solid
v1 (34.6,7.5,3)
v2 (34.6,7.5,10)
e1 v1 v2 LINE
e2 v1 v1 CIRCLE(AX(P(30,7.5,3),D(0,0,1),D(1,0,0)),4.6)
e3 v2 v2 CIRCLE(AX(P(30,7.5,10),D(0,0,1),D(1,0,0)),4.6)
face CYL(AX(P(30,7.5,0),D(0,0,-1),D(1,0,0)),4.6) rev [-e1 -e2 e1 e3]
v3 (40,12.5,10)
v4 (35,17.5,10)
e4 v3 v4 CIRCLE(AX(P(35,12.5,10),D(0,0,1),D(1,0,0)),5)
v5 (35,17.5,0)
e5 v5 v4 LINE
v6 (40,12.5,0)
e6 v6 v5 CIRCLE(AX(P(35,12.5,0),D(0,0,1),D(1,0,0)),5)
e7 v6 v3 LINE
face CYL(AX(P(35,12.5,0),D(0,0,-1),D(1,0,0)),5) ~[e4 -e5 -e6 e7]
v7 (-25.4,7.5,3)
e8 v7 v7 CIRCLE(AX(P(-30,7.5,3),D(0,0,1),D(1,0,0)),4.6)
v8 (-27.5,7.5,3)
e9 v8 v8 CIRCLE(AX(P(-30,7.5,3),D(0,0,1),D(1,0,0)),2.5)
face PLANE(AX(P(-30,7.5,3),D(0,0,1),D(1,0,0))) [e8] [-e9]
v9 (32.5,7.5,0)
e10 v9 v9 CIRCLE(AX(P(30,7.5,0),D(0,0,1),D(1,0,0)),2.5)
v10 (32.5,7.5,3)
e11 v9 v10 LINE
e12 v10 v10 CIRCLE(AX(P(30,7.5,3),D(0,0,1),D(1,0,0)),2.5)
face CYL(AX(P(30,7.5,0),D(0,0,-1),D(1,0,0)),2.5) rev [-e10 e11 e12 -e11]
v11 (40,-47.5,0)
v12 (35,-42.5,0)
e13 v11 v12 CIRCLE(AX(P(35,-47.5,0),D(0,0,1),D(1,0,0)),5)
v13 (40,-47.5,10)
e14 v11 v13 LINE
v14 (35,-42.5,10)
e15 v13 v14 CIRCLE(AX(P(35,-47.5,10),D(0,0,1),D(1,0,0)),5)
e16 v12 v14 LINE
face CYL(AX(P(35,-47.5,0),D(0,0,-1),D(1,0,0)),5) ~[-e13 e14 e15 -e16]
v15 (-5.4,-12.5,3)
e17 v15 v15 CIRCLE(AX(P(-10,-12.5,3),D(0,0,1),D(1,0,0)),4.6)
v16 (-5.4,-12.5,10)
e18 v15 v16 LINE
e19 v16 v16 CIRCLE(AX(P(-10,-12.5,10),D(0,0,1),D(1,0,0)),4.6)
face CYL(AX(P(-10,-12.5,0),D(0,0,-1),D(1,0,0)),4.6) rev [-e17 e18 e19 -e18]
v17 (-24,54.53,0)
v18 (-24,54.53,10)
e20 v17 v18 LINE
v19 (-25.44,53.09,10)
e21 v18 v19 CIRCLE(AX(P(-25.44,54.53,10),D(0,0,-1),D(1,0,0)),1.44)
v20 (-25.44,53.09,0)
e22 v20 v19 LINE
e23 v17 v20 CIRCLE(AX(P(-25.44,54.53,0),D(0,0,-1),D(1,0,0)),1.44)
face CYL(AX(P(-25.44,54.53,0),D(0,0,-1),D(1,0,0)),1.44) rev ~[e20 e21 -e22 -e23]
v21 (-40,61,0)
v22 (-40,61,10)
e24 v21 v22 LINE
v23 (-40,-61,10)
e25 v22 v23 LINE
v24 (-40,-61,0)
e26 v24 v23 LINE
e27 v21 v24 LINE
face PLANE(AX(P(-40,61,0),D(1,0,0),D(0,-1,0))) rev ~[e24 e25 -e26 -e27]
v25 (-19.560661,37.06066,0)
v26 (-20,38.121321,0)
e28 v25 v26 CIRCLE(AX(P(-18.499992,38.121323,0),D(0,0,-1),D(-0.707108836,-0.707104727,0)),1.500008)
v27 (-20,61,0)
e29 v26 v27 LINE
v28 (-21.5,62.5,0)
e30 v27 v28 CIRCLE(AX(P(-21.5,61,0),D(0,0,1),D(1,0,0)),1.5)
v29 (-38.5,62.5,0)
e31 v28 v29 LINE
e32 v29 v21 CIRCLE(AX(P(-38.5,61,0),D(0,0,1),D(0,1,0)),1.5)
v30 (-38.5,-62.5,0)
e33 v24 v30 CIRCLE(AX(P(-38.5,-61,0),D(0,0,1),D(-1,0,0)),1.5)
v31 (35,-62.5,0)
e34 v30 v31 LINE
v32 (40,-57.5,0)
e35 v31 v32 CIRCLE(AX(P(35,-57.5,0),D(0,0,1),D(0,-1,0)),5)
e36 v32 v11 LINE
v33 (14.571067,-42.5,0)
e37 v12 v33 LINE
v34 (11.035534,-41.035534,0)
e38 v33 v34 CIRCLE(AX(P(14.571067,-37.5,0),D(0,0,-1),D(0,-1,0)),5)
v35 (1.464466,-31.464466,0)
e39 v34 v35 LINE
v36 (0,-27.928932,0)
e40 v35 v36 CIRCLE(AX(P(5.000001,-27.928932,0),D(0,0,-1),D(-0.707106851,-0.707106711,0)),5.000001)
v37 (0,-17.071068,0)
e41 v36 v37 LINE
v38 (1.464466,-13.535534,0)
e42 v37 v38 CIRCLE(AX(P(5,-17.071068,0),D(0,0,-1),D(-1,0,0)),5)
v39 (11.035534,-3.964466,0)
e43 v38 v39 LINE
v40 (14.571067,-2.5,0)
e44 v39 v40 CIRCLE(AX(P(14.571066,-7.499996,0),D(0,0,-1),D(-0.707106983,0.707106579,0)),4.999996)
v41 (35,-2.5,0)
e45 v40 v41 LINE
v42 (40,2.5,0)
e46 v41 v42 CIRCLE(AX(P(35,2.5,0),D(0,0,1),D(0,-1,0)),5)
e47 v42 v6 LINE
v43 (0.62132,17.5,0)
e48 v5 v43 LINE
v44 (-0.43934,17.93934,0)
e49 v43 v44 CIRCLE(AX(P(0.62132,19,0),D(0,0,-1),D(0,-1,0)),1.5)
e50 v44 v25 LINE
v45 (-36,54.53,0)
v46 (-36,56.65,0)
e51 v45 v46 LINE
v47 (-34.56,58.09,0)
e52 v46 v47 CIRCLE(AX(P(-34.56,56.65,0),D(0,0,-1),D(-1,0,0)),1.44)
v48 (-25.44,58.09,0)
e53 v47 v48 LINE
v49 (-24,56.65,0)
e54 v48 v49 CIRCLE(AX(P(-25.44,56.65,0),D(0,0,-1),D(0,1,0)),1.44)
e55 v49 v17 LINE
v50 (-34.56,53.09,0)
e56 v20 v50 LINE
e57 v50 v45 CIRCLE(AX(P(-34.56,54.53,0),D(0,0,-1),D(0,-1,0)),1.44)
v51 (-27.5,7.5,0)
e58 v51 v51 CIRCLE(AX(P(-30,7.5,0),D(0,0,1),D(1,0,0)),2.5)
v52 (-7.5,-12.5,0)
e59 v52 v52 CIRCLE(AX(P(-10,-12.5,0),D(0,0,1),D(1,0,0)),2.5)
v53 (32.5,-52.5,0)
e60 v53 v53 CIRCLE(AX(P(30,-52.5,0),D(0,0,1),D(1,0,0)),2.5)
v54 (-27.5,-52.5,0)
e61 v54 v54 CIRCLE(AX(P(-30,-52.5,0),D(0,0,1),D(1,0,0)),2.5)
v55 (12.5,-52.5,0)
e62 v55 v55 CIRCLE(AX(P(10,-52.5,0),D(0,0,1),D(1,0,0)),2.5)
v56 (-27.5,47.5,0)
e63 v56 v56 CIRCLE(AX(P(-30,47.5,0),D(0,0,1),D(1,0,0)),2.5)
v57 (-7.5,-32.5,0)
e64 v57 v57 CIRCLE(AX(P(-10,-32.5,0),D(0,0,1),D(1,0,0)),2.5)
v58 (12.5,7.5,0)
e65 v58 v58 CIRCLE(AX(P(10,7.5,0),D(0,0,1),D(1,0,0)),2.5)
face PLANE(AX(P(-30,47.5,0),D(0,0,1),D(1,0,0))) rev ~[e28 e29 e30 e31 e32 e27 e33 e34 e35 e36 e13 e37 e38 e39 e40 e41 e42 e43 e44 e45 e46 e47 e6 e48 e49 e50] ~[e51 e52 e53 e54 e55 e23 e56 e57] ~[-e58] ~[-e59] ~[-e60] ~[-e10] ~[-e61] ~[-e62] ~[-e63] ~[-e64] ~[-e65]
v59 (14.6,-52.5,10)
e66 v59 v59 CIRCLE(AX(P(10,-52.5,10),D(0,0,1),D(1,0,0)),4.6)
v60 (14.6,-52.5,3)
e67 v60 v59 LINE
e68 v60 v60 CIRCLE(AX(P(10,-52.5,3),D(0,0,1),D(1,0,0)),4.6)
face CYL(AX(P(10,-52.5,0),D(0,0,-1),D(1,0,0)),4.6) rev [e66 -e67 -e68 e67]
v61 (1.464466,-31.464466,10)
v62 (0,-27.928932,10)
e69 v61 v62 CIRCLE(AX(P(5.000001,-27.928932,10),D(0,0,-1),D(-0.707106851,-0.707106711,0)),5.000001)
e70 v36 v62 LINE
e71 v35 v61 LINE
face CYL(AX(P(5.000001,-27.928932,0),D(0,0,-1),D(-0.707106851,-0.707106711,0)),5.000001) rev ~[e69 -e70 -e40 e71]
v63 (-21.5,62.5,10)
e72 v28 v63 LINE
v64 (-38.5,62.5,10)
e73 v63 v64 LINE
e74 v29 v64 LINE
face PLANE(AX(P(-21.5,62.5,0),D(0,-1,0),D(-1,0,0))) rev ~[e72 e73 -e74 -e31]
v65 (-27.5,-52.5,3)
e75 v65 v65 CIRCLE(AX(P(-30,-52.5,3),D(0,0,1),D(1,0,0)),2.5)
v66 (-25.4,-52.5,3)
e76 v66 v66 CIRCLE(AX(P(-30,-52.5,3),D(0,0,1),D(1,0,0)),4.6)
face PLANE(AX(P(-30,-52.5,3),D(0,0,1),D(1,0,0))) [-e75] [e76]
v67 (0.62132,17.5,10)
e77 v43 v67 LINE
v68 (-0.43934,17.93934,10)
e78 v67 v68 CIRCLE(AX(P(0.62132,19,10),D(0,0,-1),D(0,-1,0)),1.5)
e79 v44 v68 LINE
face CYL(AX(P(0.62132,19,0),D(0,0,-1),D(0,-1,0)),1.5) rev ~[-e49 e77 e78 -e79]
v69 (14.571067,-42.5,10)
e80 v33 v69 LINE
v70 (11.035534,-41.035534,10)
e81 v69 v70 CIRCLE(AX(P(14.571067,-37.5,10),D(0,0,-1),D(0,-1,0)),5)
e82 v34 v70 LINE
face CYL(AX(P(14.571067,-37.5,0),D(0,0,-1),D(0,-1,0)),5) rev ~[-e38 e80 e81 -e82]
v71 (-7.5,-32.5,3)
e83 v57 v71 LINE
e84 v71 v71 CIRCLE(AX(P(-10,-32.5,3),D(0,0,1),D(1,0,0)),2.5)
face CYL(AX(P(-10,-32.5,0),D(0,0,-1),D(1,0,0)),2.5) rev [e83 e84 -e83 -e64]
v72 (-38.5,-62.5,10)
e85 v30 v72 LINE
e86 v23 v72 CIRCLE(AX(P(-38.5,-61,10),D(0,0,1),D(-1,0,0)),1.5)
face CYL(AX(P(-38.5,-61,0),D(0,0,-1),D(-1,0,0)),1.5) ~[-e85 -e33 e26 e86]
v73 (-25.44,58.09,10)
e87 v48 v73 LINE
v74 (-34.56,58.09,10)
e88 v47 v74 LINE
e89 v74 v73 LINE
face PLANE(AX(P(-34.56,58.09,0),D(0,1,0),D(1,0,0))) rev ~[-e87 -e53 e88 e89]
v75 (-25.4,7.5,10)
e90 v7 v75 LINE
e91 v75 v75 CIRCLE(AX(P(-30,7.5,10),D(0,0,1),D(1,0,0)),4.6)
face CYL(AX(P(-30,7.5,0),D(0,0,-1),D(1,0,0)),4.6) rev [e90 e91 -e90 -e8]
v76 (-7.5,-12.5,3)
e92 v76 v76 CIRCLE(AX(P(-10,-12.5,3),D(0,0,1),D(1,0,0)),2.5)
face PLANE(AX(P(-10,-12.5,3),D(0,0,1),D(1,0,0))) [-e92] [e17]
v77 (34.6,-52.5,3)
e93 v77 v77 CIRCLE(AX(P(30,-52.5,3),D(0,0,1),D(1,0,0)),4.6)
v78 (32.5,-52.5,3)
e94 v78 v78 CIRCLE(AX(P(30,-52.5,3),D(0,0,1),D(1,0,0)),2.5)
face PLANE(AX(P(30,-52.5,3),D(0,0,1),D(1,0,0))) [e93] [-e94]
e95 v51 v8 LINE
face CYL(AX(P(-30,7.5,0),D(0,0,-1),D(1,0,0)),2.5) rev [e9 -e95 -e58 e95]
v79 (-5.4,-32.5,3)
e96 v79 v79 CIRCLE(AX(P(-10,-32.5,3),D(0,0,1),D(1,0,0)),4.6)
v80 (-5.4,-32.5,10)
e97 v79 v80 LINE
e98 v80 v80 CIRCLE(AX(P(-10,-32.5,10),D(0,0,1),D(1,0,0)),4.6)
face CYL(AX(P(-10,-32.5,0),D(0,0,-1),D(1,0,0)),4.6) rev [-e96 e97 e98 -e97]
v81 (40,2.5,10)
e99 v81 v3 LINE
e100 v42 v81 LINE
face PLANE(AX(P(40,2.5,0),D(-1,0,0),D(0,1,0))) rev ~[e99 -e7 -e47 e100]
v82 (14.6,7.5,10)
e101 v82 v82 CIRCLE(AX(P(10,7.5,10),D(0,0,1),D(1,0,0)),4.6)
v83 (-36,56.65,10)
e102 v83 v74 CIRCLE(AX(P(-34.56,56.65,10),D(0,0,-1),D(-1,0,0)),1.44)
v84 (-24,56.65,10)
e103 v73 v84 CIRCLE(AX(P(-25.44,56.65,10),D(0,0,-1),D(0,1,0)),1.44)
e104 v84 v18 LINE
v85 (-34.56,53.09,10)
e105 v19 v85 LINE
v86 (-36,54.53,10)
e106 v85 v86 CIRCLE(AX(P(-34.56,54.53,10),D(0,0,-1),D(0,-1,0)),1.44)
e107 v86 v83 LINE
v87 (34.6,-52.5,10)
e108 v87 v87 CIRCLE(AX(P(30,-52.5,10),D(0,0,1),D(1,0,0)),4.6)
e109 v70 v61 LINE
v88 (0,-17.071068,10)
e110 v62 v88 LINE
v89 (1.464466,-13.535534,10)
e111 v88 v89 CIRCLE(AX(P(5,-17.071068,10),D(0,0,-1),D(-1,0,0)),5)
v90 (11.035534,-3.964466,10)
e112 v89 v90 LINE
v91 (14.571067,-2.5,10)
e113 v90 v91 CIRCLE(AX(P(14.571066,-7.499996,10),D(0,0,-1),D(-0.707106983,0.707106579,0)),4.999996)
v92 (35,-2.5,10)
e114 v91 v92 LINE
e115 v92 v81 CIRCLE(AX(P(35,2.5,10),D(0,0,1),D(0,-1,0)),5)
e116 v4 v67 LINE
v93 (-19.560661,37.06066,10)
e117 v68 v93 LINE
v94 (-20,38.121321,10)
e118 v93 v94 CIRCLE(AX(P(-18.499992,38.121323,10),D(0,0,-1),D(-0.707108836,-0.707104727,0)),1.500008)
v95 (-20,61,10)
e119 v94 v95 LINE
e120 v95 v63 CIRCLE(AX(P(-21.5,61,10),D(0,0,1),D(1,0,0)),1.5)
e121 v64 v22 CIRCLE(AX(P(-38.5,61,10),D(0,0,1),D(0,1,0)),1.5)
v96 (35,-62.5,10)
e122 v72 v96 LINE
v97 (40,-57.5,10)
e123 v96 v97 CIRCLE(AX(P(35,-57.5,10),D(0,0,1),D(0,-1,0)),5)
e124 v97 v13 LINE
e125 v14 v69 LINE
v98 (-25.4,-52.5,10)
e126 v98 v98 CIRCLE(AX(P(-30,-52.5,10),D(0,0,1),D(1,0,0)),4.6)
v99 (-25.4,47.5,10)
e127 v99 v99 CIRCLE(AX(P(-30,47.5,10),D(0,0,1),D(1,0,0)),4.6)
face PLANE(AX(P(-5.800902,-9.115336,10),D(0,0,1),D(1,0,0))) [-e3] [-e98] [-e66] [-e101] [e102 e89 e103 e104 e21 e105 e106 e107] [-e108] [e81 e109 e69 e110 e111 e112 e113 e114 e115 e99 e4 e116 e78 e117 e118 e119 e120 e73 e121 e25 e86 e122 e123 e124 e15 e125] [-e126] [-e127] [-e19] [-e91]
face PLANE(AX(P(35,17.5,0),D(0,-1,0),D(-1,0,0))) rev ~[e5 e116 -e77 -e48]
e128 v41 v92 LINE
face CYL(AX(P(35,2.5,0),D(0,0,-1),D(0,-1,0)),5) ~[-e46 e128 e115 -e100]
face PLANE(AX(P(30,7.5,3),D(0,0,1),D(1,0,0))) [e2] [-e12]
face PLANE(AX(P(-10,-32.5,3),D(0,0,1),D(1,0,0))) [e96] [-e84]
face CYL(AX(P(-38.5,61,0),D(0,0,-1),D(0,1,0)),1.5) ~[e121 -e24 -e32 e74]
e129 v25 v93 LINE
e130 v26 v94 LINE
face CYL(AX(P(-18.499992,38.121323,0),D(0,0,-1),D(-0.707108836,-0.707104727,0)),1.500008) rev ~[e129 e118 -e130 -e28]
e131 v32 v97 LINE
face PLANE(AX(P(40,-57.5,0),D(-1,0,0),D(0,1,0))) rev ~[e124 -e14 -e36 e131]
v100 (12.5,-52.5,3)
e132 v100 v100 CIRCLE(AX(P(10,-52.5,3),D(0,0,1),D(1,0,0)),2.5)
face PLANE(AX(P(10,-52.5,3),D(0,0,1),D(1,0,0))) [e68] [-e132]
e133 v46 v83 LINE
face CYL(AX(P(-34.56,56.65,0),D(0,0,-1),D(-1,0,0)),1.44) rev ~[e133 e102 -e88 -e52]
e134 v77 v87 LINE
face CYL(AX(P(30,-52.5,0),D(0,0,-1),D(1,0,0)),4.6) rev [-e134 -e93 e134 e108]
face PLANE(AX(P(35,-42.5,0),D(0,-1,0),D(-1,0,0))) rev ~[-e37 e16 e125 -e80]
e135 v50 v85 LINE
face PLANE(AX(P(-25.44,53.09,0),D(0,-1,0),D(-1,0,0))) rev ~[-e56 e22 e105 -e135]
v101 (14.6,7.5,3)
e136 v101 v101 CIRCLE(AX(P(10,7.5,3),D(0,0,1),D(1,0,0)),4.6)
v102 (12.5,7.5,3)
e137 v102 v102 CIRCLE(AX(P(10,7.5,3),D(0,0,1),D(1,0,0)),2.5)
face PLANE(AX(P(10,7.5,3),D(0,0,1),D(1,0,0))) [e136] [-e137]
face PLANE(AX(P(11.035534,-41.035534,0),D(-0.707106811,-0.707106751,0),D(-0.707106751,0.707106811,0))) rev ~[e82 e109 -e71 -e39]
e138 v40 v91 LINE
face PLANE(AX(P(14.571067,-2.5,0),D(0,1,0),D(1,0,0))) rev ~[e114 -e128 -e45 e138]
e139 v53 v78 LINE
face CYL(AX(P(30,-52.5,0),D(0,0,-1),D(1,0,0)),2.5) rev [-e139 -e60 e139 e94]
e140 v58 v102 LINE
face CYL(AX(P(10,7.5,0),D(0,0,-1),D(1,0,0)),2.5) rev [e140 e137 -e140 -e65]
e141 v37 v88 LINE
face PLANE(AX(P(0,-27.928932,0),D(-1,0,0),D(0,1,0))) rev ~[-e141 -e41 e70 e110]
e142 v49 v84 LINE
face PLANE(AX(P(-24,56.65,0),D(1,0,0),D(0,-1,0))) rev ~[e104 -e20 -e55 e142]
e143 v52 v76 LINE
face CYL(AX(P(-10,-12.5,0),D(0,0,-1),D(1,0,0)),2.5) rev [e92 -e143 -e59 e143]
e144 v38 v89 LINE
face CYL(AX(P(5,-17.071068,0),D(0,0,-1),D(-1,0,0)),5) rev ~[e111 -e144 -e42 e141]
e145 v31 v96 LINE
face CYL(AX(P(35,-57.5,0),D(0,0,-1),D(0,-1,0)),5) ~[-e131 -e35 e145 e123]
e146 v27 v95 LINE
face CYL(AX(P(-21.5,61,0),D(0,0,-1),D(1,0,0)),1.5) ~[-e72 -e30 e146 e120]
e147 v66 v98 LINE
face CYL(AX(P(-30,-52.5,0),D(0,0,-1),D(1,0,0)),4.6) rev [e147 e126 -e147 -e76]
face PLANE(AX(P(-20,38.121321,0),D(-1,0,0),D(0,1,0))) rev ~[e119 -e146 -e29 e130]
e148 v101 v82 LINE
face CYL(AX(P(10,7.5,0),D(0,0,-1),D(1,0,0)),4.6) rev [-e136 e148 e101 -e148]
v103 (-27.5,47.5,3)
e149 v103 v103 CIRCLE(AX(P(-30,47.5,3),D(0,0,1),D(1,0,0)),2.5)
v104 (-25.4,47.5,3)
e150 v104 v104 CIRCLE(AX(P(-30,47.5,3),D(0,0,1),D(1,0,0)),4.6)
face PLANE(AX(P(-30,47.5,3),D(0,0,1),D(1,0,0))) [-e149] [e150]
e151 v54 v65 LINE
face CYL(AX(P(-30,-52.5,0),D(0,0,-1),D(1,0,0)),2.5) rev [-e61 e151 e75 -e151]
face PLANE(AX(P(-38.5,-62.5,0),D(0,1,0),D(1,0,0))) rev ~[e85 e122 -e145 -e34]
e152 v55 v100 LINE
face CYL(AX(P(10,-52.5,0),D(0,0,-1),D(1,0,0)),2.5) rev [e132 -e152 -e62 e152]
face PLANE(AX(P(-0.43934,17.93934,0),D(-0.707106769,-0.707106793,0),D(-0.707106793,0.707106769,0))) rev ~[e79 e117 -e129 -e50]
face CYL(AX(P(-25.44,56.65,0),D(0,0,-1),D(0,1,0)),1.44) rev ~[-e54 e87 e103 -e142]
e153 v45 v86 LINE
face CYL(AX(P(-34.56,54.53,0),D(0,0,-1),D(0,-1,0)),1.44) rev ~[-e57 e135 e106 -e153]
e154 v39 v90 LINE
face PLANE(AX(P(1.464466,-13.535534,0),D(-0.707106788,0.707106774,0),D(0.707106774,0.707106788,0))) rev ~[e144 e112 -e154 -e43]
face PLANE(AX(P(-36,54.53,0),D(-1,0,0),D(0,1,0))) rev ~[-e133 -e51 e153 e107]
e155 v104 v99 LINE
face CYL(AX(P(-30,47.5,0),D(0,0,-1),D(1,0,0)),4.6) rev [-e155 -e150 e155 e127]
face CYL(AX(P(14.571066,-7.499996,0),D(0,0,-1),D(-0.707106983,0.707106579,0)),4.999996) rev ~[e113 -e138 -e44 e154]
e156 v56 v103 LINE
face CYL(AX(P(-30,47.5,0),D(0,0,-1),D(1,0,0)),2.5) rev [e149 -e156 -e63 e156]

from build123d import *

# Parameters (mm, degrees)
F0_R     = 4.6
F1_DEPTH = 10
F0_R_2   = 2.5
F2_DEPTH = 3


# Not quite as in the source:
# - ends of sketch curves that miss each other by under 0.0002 mm in the source are joined


with BuildPart() as f1:
    # F0 (on Top) → F1 (new body)
    with BuildSketch(Plane.XY):
        with BuildLine():
            ThreePointArc((-40, -61), (-39.5606601718, -62.0606601718), (-38.5, -62.5))
            Line((-38.5, -62.5), (35, -62.5))
            ThreePointArc((35, -62.5), (38.5355339059, -61.0355339059), (40, -57.5))
            Line((40, -57.5), (40, -47.5))
            ThreePointArc((40, -47.5), (38.5355339059, -43.9644660941), (35, -42.5))
            Line((35, -42.5), (14.571067, -42.5))
            ThreePointArc((14.571067, -42.5), (12.6576501648, -42.1193977979), (11.0355335941, -41.0355344059))
            Line((11.0355335941, -41.0355344059), (1.464466, -31.464466))
            ThreePointArc((1.464466, -31.464466), (0.3806023374, -29.8423491618), (0, -27.928932))
            Line((0, -27.928932), (0, -17.071068))
            ThreePointArc((0, -17.071068), (0.3806023374, -15.1576508382), (1.4644660941, -13.5355340941))
            Line((1.4644660941, -13.5355340941), (11.035534, -3.964466))
            ThreePointArc((11.035534, -3.964466), (12.6576501648, -2.8806022021), (14.571067, -2.5))
            Line((14.571067, -2.5), (35, -2.5))
            ThreePointArc((35, -2.5), (38.5355339059, -1.0355339059), (40, 2.5))
            Line((40, 2.5), (40, 12.5))
            ThreePointArc((40, 12.5), (38.5355339059, 16.0355339059), (35, 17.5))
            Line((35, 17.5), (0.62132, 17.5))
            ThreePointArc((0.62132, 17.5), (0.0472948515, 17.6141807012), (-0.4393401718, 17.9393398282))
            Line((-0.4393401718, 17.9393398282), (-19.560661, 37.06066))
            ThreePointArc((-19.560661, 37.06066), (-19.8858192988, 37.5472958515), (-20, 38.121321))
            Line((-20, 38.121321), (-20, 61))
            ThreePointArc((-20, 61), (-20.4393398282, 62.0606601718), (-21.5, 62.5))
            Line((-21.5, 62.5), (-38.5, 62.5))
            ThreePointArc((-38.5, 62.5), (-39.5606601718, 62.0606601718), (-40, 61))
            Line((-40, 61), (-40, -61))
        make_face()
        with Locations((-30, -52.5)):
            Circle(F0_R, mode=Mode.SUBTRACT)
        with Locations((-10, -32.5)):
            Circle(F0_R, mode=Mode.SUBTRACT)
        with Locations((-10, -12.5)):
            Circle(F0_R, mode=Mode.SUBTRACT)
        with Locations((10, -52.5)):
            Circle(F0_R, mode=Mode.SUBTRACT)
        with Locations((30, -52.5)):
            Circle(F0_R, mode=Mode.SUBTRACT)
        with Locations((-30, 7.5)):
            Circle(F0_R, mode=Mode.SUBTRACT)
        with Locations((-30, 47.5)):
            Circle(F0_R, mode=Mode.SUBTRACT)
        with BuildLine():
            Line((-36, 54.53), (-36, 56.65))
            ThreePointArc((-36, 56.65), (-35.5782337649, 57.6682337649), (-34.56, 58.09))
            Line((-34.56, 58.09), (-25.44, 58.09))
            ThreePointArc((-25.44, 58.09), (-24.4217662351, 57.6682337649), (-24, 56.65))
            Line((-24, 56.65), (-24, 54.53))
            ThreePointArc((-24, 54.53), (-24.4217662351, 53.5117662351), (-25.44, 53.09))
            Line((-25.44, 53.09), (-34.56, 53.09))
            ThreePointArc((-34.56, 53.09), (-35.5782337649, 53.5117662351), (-36, 54.53))
        make_face(mode=Mode.SUBTRACT)
        with Locations((10, 7.5)):
            Circle(F0_R, mode=Mode.SUBTRACT)
        with Locations((30, 7.5)):
            Circle(F0_R, mode=Mode.SUBTRACT)
    extrude(amount=F1_DEPTH)

    # F0 (on Top) → F2 (join)
    with BuildSketch(Plane.XY):
        with Locations((-30, 47.5)):
            Circle(F0_R)
        with Locations((-30, 47.5)):
            Circle(F0_R_2, mode=Mode.SUBTRACT)
        with Locations((-30, 7.5)):
            Circle(F0_R)
        with Locations((-30, 7.5)):
            Circle(F0_R_2, mode=Mode.SUBTRACT)
        with Locations((-30, -52.5)):
            Circle(F0_R)
        with Locations((-30, -52.5)):
            Circle(F0_R_2, mode=Mode.SUBTRACT)
        with Locations((-10, -32.5)):
            Circle(F0_R)
        with Locations((-10, -32.5)):
            Circle(F0_R_2, mode=Mode.SUBTRACT)
        with Locations((10, -52.5)):
            Circle(F0_R)
        with Locations((10, -52.5)):
            Circle(F0_R_2, mode=Mode.SUBTRACT)
        with Locations((30, -52.5)):
            Circle(F0_R)
        with Locations((30, -52.5)):
            Circle(F0_R_2, mode=Mode.SUBTRACT)
        with Locations((-10, -12.5)):
            Circle(F0_R)
        with Locations((-10, -12.5)):
            Circle(F0_R_2, mode=Mode.SUBTRACT)
        with Locations((10, 7.5)):
            Circle(F0_R)
        with Locations((10, 7.5)):
            Circle(F0_R_2, mode=Mode.SUBTRACT)
        with Locations((30, 7.5)):
            Circle(F0_R)
        with Locations((30, 7.5)):
            Circle(F0_R_2, mode=Mode.SUBTRACT)
    extrude(amount=F2_DEPTH)


solid = f1.part
